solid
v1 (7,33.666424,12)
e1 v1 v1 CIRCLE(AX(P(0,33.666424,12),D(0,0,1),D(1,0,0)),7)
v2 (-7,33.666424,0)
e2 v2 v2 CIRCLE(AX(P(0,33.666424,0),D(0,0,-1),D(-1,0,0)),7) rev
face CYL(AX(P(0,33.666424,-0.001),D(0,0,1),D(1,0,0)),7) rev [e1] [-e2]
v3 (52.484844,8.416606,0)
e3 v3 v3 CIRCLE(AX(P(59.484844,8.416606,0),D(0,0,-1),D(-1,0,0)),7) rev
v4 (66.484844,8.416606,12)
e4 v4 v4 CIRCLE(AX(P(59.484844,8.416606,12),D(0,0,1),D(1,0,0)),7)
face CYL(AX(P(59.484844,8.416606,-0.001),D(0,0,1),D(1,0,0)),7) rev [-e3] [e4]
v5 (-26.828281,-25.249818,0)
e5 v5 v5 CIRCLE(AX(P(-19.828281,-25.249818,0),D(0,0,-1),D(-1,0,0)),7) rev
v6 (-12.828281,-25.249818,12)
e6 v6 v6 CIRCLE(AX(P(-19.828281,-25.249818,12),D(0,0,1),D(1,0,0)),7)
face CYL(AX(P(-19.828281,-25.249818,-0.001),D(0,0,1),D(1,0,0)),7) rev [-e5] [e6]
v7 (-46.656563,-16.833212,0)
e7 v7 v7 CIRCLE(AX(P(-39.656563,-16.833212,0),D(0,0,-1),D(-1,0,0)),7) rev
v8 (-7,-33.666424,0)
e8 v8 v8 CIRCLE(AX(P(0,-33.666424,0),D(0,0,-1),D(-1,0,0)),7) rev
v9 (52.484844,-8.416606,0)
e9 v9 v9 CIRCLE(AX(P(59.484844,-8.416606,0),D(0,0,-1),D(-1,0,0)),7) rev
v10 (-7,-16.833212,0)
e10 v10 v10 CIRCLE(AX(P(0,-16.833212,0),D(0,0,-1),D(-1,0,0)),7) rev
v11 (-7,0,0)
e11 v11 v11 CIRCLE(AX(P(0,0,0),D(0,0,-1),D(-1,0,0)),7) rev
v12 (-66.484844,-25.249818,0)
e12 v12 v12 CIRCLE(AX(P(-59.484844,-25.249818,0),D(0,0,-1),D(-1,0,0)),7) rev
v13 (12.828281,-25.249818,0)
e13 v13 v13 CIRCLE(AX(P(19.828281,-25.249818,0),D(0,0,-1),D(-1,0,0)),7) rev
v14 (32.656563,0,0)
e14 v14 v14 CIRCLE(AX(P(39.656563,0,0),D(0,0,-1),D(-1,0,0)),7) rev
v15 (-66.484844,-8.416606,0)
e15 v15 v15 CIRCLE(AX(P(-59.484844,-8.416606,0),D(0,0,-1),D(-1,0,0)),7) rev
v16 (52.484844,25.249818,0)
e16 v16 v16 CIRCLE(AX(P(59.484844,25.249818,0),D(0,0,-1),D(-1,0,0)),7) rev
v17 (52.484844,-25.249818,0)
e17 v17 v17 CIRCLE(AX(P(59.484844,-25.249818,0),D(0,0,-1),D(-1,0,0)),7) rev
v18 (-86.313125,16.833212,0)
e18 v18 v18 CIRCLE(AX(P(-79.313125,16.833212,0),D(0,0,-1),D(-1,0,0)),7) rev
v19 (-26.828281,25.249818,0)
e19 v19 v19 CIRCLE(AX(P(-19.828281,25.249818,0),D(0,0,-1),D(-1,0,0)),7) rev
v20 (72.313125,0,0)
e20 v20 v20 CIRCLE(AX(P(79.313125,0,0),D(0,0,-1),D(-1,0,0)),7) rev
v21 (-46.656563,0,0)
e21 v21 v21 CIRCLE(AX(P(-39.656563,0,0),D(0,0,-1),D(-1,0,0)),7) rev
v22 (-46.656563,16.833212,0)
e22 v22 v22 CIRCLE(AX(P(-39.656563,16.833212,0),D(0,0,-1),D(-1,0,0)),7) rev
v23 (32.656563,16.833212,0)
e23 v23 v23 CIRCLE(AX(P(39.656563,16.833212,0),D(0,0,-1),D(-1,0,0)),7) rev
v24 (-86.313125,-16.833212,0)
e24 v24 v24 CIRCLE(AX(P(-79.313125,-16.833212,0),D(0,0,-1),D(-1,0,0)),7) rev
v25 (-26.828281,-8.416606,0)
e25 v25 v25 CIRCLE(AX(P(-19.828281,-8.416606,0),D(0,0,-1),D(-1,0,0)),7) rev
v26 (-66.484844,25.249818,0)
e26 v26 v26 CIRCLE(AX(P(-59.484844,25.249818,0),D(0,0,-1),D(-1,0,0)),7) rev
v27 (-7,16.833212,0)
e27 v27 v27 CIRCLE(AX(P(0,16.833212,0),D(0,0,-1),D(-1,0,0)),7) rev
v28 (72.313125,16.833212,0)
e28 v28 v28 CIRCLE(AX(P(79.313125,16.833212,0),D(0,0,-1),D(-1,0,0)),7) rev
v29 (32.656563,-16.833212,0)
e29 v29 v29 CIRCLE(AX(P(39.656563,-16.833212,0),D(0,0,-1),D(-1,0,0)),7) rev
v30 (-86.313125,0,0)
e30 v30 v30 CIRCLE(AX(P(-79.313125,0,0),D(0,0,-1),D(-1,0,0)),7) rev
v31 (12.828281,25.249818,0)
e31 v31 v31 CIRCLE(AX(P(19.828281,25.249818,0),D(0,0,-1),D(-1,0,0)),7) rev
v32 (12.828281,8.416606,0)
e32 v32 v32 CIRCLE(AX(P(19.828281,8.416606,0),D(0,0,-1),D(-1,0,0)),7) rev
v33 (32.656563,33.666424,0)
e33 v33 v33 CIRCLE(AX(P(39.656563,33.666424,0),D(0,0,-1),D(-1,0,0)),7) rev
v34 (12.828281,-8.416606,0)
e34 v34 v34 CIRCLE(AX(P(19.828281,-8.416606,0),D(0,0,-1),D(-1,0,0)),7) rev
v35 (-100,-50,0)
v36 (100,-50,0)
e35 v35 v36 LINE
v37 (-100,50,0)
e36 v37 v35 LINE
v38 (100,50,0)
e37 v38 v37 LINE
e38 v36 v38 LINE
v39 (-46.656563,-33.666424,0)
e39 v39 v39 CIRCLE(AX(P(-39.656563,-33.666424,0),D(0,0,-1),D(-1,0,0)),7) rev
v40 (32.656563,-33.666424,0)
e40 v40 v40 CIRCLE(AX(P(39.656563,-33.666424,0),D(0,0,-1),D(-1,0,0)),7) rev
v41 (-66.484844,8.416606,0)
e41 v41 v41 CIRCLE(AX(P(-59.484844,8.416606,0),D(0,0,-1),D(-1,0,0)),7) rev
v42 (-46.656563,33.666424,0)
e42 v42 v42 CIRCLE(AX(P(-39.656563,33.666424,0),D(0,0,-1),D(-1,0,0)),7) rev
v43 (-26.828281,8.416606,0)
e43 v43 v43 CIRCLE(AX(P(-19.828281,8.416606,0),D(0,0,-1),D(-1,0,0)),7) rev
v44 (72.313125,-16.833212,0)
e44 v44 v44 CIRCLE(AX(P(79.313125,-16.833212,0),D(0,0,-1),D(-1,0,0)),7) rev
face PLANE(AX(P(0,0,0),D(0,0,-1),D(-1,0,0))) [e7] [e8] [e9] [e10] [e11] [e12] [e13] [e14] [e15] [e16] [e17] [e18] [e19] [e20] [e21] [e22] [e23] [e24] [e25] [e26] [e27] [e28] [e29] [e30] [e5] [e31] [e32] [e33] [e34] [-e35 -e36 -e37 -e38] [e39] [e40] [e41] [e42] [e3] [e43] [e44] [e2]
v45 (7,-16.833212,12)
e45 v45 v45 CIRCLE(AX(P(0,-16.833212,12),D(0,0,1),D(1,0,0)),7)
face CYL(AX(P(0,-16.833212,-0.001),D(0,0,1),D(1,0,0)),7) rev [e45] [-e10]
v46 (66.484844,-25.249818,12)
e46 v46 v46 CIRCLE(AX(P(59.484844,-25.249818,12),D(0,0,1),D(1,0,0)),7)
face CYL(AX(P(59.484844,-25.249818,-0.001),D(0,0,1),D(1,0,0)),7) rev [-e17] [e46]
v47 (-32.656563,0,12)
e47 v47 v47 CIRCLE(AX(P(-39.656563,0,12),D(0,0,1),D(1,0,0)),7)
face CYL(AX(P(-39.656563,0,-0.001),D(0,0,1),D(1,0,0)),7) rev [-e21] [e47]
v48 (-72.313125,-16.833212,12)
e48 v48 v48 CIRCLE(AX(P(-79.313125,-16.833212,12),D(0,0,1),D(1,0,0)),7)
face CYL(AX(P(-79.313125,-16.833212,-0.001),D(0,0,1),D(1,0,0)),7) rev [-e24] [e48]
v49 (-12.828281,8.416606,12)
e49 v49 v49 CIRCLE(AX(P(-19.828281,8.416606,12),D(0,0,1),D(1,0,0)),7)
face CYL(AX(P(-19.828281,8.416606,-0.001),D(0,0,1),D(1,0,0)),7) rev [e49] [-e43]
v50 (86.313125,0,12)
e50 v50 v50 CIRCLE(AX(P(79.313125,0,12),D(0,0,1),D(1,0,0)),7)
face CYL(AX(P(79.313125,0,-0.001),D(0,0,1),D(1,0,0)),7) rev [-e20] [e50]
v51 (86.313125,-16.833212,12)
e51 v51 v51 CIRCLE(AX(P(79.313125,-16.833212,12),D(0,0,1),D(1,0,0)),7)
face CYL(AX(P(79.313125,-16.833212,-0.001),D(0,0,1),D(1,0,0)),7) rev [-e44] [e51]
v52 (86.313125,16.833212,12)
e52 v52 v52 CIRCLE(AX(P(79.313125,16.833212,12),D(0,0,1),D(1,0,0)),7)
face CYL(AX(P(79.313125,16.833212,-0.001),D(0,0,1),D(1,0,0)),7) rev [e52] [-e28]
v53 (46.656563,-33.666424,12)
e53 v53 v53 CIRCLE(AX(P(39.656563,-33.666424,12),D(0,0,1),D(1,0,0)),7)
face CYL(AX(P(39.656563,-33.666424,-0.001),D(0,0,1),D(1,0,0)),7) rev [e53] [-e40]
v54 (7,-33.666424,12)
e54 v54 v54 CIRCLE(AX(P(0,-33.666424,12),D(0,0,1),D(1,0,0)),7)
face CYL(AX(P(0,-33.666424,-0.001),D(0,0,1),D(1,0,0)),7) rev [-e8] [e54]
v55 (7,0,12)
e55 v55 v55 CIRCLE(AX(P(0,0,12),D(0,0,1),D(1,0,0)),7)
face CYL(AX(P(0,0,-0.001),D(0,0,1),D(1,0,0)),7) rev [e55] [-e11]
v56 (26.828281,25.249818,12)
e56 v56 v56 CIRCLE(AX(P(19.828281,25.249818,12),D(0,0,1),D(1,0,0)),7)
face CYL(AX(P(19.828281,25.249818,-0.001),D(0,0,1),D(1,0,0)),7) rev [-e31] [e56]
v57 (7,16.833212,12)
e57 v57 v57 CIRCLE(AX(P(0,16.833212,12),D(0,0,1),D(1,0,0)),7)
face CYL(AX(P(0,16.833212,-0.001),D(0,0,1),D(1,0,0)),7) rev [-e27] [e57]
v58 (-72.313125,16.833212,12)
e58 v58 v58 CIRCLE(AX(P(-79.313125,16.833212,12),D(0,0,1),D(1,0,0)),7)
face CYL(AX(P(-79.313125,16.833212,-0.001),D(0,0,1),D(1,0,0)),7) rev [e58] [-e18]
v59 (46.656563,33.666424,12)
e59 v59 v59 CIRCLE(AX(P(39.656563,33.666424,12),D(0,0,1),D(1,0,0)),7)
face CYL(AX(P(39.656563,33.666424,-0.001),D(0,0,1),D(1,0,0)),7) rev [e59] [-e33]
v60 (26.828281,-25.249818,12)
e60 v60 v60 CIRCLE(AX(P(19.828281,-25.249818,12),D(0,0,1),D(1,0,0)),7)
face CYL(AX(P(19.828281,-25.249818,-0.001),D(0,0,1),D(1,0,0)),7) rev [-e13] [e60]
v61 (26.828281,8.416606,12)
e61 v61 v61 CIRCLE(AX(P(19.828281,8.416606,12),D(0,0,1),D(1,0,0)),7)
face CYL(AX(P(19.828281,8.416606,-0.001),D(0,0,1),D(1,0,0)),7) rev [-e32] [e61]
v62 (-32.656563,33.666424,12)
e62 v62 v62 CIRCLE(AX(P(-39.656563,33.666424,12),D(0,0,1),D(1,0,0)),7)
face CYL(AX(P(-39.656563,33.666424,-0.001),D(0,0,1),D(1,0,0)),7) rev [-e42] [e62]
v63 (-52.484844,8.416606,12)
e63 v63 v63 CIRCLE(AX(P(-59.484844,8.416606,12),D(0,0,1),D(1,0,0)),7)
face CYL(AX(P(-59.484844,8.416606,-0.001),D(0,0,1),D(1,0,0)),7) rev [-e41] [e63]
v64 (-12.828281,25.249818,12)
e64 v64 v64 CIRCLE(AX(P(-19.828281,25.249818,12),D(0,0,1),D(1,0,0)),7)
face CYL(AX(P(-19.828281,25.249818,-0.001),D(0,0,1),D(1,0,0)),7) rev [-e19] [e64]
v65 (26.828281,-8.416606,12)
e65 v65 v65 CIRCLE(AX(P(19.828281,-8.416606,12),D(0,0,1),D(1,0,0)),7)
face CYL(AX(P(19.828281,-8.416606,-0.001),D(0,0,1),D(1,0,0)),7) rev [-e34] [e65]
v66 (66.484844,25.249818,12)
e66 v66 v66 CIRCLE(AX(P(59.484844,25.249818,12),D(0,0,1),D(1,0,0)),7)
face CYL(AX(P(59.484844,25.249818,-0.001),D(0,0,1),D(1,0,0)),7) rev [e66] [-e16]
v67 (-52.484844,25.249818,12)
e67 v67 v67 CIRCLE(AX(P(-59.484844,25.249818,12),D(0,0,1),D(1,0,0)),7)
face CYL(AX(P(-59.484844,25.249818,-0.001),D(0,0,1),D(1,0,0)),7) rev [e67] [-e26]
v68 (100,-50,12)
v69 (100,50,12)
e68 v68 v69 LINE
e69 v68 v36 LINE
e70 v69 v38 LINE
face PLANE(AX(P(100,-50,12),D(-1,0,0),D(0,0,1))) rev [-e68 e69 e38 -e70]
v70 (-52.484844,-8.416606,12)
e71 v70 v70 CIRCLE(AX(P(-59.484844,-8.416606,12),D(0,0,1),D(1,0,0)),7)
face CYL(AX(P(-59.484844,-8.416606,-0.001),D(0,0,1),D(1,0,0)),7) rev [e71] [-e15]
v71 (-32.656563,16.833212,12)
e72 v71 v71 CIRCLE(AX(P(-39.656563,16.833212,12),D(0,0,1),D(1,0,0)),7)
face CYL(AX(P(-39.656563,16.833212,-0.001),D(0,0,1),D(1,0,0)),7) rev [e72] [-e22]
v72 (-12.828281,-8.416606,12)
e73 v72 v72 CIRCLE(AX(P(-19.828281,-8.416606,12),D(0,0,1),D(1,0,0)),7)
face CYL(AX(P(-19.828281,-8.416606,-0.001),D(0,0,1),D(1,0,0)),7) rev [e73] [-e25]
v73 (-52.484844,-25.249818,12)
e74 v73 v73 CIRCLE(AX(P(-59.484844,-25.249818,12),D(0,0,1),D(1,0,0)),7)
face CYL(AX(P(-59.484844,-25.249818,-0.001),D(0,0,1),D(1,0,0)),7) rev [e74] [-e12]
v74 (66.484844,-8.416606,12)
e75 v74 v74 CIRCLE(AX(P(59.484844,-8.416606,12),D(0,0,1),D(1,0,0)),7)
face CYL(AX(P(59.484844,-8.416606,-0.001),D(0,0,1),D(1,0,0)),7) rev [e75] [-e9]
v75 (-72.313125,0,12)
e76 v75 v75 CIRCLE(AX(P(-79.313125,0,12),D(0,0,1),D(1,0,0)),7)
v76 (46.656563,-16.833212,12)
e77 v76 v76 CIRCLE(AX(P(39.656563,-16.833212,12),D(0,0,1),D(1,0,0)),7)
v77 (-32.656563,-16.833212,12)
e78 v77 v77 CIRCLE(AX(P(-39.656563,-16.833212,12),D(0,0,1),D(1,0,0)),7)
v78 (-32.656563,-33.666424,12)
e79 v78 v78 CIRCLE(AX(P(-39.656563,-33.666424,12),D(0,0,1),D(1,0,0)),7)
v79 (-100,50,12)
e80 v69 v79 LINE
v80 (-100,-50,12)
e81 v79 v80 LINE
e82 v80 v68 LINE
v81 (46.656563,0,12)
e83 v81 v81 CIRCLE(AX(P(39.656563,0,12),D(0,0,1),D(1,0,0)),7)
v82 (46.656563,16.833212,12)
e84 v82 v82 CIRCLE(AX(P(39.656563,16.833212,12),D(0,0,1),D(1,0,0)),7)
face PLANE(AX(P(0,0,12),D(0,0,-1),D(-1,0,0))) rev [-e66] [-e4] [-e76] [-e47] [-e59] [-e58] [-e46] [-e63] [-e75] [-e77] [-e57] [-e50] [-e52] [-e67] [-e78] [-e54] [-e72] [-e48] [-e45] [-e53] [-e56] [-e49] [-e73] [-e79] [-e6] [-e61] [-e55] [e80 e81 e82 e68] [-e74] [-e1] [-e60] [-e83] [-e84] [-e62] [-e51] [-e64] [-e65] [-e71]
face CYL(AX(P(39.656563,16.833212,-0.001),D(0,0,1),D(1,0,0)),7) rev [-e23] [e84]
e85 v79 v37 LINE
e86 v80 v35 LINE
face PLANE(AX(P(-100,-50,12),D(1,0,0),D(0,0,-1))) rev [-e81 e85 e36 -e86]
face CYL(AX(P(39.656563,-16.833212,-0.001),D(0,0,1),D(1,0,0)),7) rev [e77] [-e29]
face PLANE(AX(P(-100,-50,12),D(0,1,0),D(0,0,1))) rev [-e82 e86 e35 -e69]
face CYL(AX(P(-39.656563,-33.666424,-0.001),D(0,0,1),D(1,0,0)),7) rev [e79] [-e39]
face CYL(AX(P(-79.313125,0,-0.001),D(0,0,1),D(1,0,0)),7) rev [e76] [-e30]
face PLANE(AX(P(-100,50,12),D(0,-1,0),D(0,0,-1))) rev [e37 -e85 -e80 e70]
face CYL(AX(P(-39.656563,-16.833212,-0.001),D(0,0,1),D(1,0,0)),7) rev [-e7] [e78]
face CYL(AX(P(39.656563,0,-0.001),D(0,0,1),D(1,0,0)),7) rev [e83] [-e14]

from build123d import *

# Parameters (mm, degrees)
SKETCH1_W               = 200
SKETCH1_H               = 100
BOSS_EXTRUDE1_DEPTH     = 12
CUT_EXTRUDE1_REACH      = 114.446
SKETCH2_R               = 7
FILL_PATTERN1_OUTLINE_R = 7
FILL_PATTERN1_DEPTH     = 12


# Read off the part's stored shape, not the designer's step: Fill Pattern1
with BuildPart() as part:
    # Sketch1 → Boss-Extrude1 (new body)
    with BuildSketch(Plane.XY):
        Rectangle(SKETCH1_W, SKETCH1_H)
    extrude(amount=BOSS_EXTRUDE1_DEPTH)

    # Sketch2 → Cut-Extrude1 (cut, up to next)
    with BuildSketch(Plane.XY.offset(12), mode=Mode.PRIVATE) as cut_extrude1_sk1:
        Circle(SKETCH2_R)
    cut_extrude1_tool1 = extrude(cut_extrude1_sk1.sketch, amount=-CUT_EXTRUDE1_REACH, mode=Mode.PRIVATE) & part.part
    add(cut_extrude1_tool1.solids().sort_by_distance((0, 0, 12))[0], mode=Mode.SUBTRACT)

    # Fill Pattern1 outline → Fill Pattern1 (cut)
    with BuildSketch(Plane.XY):
        with Locations((-39.656562733, 33.666424355)):
            Circle(FILL_PATTERN1_OUTLINE_R)
        with Locations((39.656562733, -33.666424355)):
            Circle(FILL_PATTERN1_OUTLINE_R)
        with Locations((59.484844099, -25.249818266)):
            Circle(FILL_PATTERN1_OUTLINE_R)
        with Locations((79.313125466, -16.833212178)):
            Circle(FILL_PATTERN1_OUTLINE_R)
        with Locations((19.828281366, 25.249818266)):
            Circle(FILL_PATTERN1_OUTLINE_R)
        with Locations((0, 16.833212178)):
            Circle(FILL_PATTERN1_OUTLINE_R)
        with Locations((-19.828281366, 8.416606089)):
            Circle(FILL_PATTERN1_OUTLINE_R)
        with Locations((-39.656562733, 0)):
            Circle(FILL_PATTERN1_OUTLINE_R)
        with Locations((-59.484844099, -8.416606089)):
            Circle(FILL_PATTERN1_OUTLINE_R)
        with Locations((-79.313125466, -16.833212178)):
            Circle(FILL_PATTERN1_OUTLINE_R)
        with Locations((59.484844099, 25.249818266)):
            Circle(FILL_PATTERN1_OUTLINE_R)
        with Locations((39.656562733, 16.833212178)):
            Circle(FILL_PATTERN1_OUTLINE_R)
        with Locations((-59.484844099, 25.249818266)):
            Circle(FILL_PATTERN1_OUTLINE_R)
        with Locations((-79.313125466, 16.833212178)):
            Circle(FILL_PATTERN1_OUTLINE_R)
        with Locations((0, 33.666424355)):
            Circle(FILL_PATTERN1_OUTLINE_R)
        with Locations((-19.828281366, 25.249818266)):
            Circle(FILL_PATTERN1_OUTLINE_R)
        with Locations((39.656562733, 33.666424355)):
            Circle(FILL_PATTERN1_OUTLINE_R)
        with Locations((-79.313125466, 0)):
            Circle(FILL_PATTERN1_OUTLINE_R)
        with Locations((-59.484844099, 8.416606089)):
            Circle(FILL_PATTERN1_OUTLINE_R)
        with Locations((-39.656562733, 16.833212178)):
            Circle(FILL_PATTERN1_OUTLINE_R)
        with Locations((79.313125466, 0)):
            Circle(FILL_PATTERN1_OUTLINE_R)
        with Locations((-39.656562733, -33.666424355)):
            Circle(FILL_PATTERN1_OUTLINE_R)
        with Locations((-19.828281366, -25.249818266)):
            Circle(FILL_PATTERN1_OUTLINE_R)
        with Locations((0, -16.833212178)):
            Circle(FILL_PATTERN1_OUTLINE_R)
        with Locations((59.484844099, -8.416606089)):
            Circle(FILL_PATTERN1_OUTLINE_R)
        with Locations((39.656562733, -16.833212178)):
            Circle(FILL_PATTERN1_OUTLINE_R)
        with Locations((19.828281366, -25.249818266)):
            Circle(FILL_PATTERN1_OUTLINE_R)
        with Locations((0, -33.666424355)):
            Circle(FILL_PATTERN1_OUTLINE_R)
        with Locations((19.828281366, 8.416606089)):
            Circle(FILL_PATTERN1_OUTLINE_R)
        with Locations((-19.828281366, -8.416606089)):
            Circle(FILL_PATTERN1_OUTLINE_R)
        with Locations((-39.656562733, -16.833212178)):
            Circle(FILL_PATTERN1_OUTLINE_R)
        with Locations((-59.484844099, -25.249818266)):
            Circle(FILL_PATTERN1_OUTLINE_R)
        with Locations((79.313125466, 16.833212178)):
            Circle(FILL_PATTERN1_OUTLINE_R)
        with Locations((59.484844099, 8.416606089)):
            Circle(FILL_PATTERN1_OUTLINE_R)
        with Locations((39.656562733, 0)):
            Circle(FILL_PATTERN1_OUTLINE_R)
        with Locations((19.828281366, -8.416606089)):
            Circle(FILL_PATTERN1_OUTLINE_R)
    extrude(amount=FILL_PATTERN1_DEPTH, mode=Mode.SUBTRACT)


solid = part.part
